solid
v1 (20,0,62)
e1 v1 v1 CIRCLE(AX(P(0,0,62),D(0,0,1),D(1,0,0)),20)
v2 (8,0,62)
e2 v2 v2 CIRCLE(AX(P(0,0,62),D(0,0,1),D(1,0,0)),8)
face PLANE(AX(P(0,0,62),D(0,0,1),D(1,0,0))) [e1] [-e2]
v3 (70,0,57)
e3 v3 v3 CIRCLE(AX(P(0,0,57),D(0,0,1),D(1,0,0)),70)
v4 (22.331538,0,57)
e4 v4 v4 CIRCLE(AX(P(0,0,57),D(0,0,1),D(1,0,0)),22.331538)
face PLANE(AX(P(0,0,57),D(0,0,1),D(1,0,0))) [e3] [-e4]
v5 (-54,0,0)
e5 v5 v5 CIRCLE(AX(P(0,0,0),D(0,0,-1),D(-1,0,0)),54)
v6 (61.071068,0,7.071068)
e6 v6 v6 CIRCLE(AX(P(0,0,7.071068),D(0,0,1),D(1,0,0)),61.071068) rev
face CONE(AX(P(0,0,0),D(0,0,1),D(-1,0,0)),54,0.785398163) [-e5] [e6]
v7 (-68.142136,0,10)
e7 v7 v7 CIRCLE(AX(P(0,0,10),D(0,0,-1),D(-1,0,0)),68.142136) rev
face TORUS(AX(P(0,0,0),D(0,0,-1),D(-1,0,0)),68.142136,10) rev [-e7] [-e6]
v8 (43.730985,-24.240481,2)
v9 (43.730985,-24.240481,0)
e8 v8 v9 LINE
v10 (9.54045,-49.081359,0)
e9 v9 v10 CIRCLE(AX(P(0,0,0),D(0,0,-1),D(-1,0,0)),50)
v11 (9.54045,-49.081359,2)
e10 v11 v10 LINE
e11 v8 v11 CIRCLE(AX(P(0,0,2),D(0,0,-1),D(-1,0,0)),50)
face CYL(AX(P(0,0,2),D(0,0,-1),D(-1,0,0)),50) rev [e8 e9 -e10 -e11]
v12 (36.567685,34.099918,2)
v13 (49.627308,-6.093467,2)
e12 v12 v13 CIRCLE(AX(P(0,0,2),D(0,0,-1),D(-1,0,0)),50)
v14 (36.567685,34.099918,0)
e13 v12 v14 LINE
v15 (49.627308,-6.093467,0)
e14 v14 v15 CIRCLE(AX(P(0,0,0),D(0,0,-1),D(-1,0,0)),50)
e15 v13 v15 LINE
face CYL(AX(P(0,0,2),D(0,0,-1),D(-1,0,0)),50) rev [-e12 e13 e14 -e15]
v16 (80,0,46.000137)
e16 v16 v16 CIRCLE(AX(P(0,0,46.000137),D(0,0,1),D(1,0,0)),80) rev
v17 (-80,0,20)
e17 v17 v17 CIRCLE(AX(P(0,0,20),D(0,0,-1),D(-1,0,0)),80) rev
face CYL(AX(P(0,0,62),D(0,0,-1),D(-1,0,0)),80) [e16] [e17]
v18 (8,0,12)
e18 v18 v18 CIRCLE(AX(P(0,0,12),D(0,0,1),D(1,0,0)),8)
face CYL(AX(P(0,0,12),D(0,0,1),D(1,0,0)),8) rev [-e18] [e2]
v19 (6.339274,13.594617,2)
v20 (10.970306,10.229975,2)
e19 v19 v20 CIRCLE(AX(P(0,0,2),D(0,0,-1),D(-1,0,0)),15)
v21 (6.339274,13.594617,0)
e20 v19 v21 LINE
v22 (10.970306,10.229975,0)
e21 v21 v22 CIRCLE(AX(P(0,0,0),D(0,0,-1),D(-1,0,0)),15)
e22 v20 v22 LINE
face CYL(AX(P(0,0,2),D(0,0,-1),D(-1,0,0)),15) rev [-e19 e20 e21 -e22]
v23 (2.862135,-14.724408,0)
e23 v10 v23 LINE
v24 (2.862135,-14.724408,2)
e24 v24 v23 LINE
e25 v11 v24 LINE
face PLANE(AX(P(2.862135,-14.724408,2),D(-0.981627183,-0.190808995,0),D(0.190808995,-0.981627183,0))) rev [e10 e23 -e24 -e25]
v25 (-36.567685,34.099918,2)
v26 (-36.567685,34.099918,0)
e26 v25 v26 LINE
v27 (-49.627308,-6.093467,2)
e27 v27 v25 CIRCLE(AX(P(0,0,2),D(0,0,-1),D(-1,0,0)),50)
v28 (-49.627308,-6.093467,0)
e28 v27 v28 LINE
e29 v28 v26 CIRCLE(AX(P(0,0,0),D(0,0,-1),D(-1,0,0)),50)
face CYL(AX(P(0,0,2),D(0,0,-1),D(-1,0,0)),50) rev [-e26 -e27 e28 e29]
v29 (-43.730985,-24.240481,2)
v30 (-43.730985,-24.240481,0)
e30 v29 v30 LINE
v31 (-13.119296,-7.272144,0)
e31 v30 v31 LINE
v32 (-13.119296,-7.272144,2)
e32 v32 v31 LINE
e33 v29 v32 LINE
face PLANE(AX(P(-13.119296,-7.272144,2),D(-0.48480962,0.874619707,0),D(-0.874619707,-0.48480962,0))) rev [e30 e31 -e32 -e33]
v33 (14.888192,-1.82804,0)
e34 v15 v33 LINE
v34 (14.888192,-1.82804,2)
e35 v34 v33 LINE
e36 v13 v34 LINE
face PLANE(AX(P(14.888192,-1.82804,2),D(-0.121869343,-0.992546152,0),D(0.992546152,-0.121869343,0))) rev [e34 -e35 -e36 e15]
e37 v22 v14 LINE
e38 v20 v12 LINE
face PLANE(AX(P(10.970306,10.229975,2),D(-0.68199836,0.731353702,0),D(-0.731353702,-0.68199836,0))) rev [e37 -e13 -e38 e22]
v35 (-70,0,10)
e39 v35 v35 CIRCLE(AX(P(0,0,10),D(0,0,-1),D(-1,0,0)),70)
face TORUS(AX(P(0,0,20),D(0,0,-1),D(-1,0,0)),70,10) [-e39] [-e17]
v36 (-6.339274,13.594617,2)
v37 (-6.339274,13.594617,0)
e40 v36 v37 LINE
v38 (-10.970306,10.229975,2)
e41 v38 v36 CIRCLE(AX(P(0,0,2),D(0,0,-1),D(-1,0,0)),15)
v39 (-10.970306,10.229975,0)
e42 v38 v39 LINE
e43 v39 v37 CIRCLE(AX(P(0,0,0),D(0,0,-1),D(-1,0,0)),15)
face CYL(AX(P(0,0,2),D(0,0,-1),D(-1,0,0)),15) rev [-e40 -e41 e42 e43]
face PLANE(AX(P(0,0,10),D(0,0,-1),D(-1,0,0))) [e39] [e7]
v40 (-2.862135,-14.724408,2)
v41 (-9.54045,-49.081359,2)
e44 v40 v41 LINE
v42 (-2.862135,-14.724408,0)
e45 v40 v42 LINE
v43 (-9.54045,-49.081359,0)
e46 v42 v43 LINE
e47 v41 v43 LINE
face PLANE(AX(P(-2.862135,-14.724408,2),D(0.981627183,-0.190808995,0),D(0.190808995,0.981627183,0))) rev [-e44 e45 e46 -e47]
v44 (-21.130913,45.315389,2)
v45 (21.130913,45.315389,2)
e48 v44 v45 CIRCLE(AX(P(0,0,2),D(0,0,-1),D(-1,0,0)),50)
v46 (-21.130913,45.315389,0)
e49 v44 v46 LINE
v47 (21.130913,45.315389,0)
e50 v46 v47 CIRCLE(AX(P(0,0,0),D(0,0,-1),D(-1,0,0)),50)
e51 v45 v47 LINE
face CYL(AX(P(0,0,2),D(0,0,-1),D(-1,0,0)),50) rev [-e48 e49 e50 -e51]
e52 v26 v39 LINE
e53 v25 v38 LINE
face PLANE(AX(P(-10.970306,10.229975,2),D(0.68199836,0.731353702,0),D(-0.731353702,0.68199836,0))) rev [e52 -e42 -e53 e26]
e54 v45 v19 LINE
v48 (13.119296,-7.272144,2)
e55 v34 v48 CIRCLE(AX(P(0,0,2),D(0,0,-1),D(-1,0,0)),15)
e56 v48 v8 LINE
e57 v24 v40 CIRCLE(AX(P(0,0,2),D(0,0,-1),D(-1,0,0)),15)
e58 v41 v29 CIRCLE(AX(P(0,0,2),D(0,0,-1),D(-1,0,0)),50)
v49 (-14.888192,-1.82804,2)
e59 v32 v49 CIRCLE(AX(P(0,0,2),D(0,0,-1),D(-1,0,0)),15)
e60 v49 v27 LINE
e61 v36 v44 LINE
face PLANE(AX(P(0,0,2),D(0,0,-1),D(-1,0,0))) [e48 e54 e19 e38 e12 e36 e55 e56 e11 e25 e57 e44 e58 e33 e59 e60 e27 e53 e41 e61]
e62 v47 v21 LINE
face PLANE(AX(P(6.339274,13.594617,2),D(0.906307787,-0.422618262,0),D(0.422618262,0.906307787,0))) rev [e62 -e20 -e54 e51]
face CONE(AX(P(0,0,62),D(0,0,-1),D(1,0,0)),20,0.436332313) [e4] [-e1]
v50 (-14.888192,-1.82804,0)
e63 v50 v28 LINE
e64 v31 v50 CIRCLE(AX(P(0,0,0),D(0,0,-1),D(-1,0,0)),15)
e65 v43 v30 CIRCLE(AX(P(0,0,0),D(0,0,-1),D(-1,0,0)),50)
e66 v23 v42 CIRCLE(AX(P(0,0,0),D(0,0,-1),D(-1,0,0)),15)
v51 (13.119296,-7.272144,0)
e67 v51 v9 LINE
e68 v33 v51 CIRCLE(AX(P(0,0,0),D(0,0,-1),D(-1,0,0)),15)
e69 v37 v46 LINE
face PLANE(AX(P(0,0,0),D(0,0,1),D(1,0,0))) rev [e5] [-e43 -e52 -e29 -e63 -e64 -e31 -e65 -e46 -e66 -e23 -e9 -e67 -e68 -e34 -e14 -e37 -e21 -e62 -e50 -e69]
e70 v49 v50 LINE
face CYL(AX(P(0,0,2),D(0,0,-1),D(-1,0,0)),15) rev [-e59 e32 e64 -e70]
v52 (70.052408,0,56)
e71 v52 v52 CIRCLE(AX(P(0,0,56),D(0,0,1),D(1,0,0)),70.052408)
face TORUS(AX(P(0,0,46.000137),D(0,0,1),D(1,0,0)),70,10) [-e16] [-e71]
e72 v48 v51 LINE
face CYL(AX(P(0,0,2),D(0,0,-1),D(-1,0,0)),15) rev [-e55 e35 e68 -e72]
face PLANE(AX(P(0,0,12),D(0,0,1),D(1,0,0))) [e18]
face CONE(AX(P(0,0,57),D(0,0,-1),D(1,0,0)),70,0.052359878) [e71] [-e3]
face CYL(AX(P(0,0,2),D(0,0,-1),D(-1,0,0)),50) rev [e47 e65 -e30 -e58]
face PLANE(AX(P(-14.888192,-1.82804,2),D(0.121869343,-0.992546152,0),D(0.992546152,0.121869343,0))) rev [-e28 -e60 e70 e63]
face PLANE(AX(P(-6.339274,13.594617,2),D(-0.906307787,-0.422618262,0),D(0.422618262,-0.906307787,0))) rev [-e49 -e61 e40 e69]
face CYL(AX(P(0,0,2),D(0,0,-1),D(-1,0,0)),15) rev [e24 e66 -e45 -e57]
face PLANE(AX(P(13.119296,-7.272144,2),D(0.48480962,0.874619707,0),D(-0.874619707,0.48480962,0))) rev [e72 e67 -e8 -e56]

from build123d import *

# Parameters (mm, degrees)
SKETCH1_R           = 80
BOSS_EXTRUDE1_DEPTH = 62
SKETCH3_OUTSIDE_W   = 228.922
SKETCH3_OUTSIDE_H   = 228.922
SKETCH3_OUTSIDE_R   = 54
CUT_EXTRUDE1_DEPTH  = 10
CUT_EXTRUDE1_DRAFT  = -45
SKETCH4_OUTSIDE_W   = 213.586
SKETCH4_OUTSIDE_H   = 213.586
SKETCH4_OUTSIDE_R   = 20
CUT_EXTRUDE2_DEPTH  = 5
CUT_EXTRUDE2_DRAFT  = -25
CUT_EXTRUDE3_DEPTH  = 2
SKETCH6_OUTSIDE_W   = 209.028
SKETCH6_OUTSIDE_H   = 209.028
SKETCH6_OUTSIDE_R   = 70
CUT_EXTRUDE4_DEPTH  = 1
CUT_EXTRUDE4_DRAFT  = -3
SKETCH2_R           = 8
CUT_EXTRUDE5_DEPTH  = 50


with BuildPart() as part:
    # Sketch1 → Boss-Extrude1 (new body)
    with BuildSketch(Plane.XY):
        Circle(SKETCH1_R)
    extrude(amount=BOSS_EXTRUDE1_DEPTH)


with BuildPart() as cut_extrude1_tool:
    # Sketch3 outside → Cut-Extrude1 (with draft: the straight prism first)
    with BuildSketch(Plane(origin=(0, 0, 0), x_dir=(-1, 0, 0), z_dir=(0, 0, -1))):
        Rectangle(SKETCH3_OUTSIDE_W, SKETCH3_OUTSIDE_H)
        Circle(SKETCH3_OUTSIDE_R, mode=Mode.SUBTRACT)
    extrude(amount=-CUT_EXTRUDE1_DEPTH)
    # Cut-Extrude1: the draft: its side faces are tilted about the plane it starts from
    cut_extrude1_sides = [cut_extrude1_tool.faces().sort_by_distance(p)[0] for p in [
        (0, -114.461, 5),
        (-114.461, 0, 5),
        (0, 114.461, 5),
        (114.461, 0, 5),
        (54, 0, 5),
    ]]
    draft(cut_extrude1_sides, Plane(origin=(0, 0, 0), x_dir=(-1, 0, 0), z_dir=(0, 0, -1)), CUT_EXTRUDE1_DRAFT)


with BuildPart() as part_1:
    add(part.part)

    # Cut-Extrude1: cut by cut_extrude1_tool
    add(cut_extrude1_tool.part, mode=Mode.SUBTRACT)


with BuildPart() as cut_extrude2_tool:
    # Sketch4 outside → Cut-Extrude2 (with draft: the straight prism first)
    with BuildSketch(Plane.XY.offset(62)):
        Rectangle(SKETCH4_OUTSIDE_W, SKETCH4_OUTSIDE_H)
        Circle(SKETCH4_OUTSIDE_R, mode=Mode.SUBTRACT)
    extrude(amount=-CUT_EXTRUDE2_DEPTH)
    # Cut-Extrude2: the draft: its side faces are tilted about the plane it starts from
    cut_extrude2_sides = [cut_extrude2_tool.faces().sort_by_distance(p)[0] for p in [
        (0, -106.793, 59.5),
        (106.793, 0, 59.5),
        (0, 106.793, 59.5),
        (-106.793, 0, 59.5),
        (-20, 0, 59.5),
    ]]
    draft(cut_extrude2_sides, Plane.XY.offset(62), CUT_EXTRUDE2_DRAFT)


with BuildPart() as part_2:
    add(part_1.part)

    # Cut-Extrude2: cut by cut_extrude2_tool
    add(cut_extrude2_tool.part, mode=Mode.SUBTRACT)

    # Sketch5 → Cut-Extrude3 (cut)
    with BuildSketch(Plane(origin=(0, 0, 0), x_dir=(-1, 0, 0), z_dir=(0, 0, -1))):
        with BuildLine():
            Line((10.970305524, 10.229975401), (36.567685081, 34.099918003))
            ThreePointArc((36.567685081, 34.099918003), (47.552825815, 15.450849719), (49.627307582, -6.09346717))
            Line((49.627307582, -6.09346717), (14.888192275, -1.828040151))
            ThreePointArc((14.888192275, -1.828040151), (14.265847744, -4.635254916), (13.119295607, -7.272144304))
            Line((13.119295607, -7.272144304), (43.730985357, -24.240481012))
            ThreePointArc((43.730985357, -24.240481012), (29.389262615, -40.450849719), (9.540449769, -49.081359172))
            Line((9.540449769, -49.081359172), (2.862134931, -14.724407752))
            ThreePointArc((2.862134931, -14.724407752), (0, -15), (-2.862134931, -14.724407752))
            Line((-2.862134931, -14.724407752), (-9.540449769, -49.081359172))
            ThreePointArc((-9.540449769, -49.081359172), (-29.389262615, -40.450849719), (-43.730985357, -24.240481012))
            Line((-43.730985357, -24.240481012), (-13.119295607, -7.272144304))
            ThreePointArc((-13.119295607, -7.272144304), (-14.265847744, -4.635254916), (-14.888192275, -1.828040151))
            Line((-14.888192275, -1.828040151), (-49.627307582, -6.09346717))
            ThreePointArc((-49.627307582, -6.09346717), (-47.552825815, 15.450849719), (-36.567685081, 34.099918003))
            Line((-36.567685081, 34.099918003), (-10.970305524, 10.229975401))
            ThreePointArc((-10.970305524, 10.229975401), (-8.816778784, 12.135254916), (-6.339273926, 13.594616806))
            Line((-6.339273926, 13.594616806), (-21.130913087, 45.315389352))
            ThreePointArc((-21.130913087, 45.315389352), (0, 50), (21.130913087, 45.315389352))
            Line((21.130913087, 45.315389352), (6.339273926, 13.594616806))
            ThreePointArc((6.339273926, 13.594616806), (8.816778784, 12.135254916), (10.970305524, 10.229975401))
        make_face()
    extrude(amount=-CUT_EXTRUDE3_DEPTH, mode=Mode.SUBTRACT)


with BuildPart() as cut_extrude4_tool:
    # Sketch6 outside → Cut-Extrude4 (with draft: the straight prism first)
    with BuildSketch(Plane.XY.offset(57)):
        Rectangle(SKETCH6_OUTSIDE_W, SKETCH6_OUTSIDE_H)
        Circle(SKETCH6_OUTSIDE_R, mode=Mode.SUBTRACT)
    extrude(amount=-CUT_EXTRUDE4_DEPTH)
    # Cut-Extrude4: the draft: its side faces are tilted about the plane it starts from
    cut_extrude4_sides = [cut_extrude4_tool.faces().sort_by_distance(p)[0] for p in [
        (0, -104.514, 56.5),
        (104.514, 0, 56.5),
        (0, 104.514, 56.5),
        (-104.514, 0, 56.5),
        (-70, 0, 56.5),
    ]]
    draft(cut_extrude4_sides, Plane.XY.offset(57), CUT_EXTRUDE4_DRAFT)


with BuildPart() as part_3:
    add(part_2.part)

    # Cut-Extrude4: cut by cut_extrude4_tool
    add(cut_extrude4_tool.part, mode=Mode.SUBTRACT)

    # Fillet1: read off the stored shape, not the designer's step
    # Fillet1 outline → Fillet1 (revolve, cut)
    with BuildSketch(Plane.XZ):
        with BuildLine():
            ThreePointArc((80, 20), (77.071067812, 12.928932188), (70, 10))
            Line((70, 10), (80, 10))
            Line((80, 10), (80, 20))
        make_face()
        with BuildLine():
            ThreePointArc((70.052407779, 56), (77.089572547, 53.052651853), (80, 46.00013733))
            Line((80, 46.00013733), (80, 56))
            Line((80, 56), (70.052407779, 56))
        make_face()
    revolve(axis=Axis((0, 0, 0), (0, 0, 1)), mode=Mode.SUBTRACT)

    # Fillet1 2 outline → Fillet1 2 (revolve)
    with BuildSketch(Plane.XZ):
        with BuildLine():
            Line((61.071067812, 10), (61.071067812, 7.071067812))
            ThreePointArc((61.071067812, 7.071067812), (64.3153013, 9.238795325), (68.142135624, 10))
            Line((68.142135624, 10), (61.071067812, 10))
        make_face()
    revolve(axis=Axis((0, 0, 0), (0, 0, 1)))

    # Sketch2 → Cut-Extrude5 (cut)
    with BuildSketch(Plane.XY.offset(62)):
        Circle(SKETCH2_R)
    extrude(amount=-CUT_EXTRUDE5_DEPTH, mode=Mode.SUBTRACT)


solid = part_3.part
